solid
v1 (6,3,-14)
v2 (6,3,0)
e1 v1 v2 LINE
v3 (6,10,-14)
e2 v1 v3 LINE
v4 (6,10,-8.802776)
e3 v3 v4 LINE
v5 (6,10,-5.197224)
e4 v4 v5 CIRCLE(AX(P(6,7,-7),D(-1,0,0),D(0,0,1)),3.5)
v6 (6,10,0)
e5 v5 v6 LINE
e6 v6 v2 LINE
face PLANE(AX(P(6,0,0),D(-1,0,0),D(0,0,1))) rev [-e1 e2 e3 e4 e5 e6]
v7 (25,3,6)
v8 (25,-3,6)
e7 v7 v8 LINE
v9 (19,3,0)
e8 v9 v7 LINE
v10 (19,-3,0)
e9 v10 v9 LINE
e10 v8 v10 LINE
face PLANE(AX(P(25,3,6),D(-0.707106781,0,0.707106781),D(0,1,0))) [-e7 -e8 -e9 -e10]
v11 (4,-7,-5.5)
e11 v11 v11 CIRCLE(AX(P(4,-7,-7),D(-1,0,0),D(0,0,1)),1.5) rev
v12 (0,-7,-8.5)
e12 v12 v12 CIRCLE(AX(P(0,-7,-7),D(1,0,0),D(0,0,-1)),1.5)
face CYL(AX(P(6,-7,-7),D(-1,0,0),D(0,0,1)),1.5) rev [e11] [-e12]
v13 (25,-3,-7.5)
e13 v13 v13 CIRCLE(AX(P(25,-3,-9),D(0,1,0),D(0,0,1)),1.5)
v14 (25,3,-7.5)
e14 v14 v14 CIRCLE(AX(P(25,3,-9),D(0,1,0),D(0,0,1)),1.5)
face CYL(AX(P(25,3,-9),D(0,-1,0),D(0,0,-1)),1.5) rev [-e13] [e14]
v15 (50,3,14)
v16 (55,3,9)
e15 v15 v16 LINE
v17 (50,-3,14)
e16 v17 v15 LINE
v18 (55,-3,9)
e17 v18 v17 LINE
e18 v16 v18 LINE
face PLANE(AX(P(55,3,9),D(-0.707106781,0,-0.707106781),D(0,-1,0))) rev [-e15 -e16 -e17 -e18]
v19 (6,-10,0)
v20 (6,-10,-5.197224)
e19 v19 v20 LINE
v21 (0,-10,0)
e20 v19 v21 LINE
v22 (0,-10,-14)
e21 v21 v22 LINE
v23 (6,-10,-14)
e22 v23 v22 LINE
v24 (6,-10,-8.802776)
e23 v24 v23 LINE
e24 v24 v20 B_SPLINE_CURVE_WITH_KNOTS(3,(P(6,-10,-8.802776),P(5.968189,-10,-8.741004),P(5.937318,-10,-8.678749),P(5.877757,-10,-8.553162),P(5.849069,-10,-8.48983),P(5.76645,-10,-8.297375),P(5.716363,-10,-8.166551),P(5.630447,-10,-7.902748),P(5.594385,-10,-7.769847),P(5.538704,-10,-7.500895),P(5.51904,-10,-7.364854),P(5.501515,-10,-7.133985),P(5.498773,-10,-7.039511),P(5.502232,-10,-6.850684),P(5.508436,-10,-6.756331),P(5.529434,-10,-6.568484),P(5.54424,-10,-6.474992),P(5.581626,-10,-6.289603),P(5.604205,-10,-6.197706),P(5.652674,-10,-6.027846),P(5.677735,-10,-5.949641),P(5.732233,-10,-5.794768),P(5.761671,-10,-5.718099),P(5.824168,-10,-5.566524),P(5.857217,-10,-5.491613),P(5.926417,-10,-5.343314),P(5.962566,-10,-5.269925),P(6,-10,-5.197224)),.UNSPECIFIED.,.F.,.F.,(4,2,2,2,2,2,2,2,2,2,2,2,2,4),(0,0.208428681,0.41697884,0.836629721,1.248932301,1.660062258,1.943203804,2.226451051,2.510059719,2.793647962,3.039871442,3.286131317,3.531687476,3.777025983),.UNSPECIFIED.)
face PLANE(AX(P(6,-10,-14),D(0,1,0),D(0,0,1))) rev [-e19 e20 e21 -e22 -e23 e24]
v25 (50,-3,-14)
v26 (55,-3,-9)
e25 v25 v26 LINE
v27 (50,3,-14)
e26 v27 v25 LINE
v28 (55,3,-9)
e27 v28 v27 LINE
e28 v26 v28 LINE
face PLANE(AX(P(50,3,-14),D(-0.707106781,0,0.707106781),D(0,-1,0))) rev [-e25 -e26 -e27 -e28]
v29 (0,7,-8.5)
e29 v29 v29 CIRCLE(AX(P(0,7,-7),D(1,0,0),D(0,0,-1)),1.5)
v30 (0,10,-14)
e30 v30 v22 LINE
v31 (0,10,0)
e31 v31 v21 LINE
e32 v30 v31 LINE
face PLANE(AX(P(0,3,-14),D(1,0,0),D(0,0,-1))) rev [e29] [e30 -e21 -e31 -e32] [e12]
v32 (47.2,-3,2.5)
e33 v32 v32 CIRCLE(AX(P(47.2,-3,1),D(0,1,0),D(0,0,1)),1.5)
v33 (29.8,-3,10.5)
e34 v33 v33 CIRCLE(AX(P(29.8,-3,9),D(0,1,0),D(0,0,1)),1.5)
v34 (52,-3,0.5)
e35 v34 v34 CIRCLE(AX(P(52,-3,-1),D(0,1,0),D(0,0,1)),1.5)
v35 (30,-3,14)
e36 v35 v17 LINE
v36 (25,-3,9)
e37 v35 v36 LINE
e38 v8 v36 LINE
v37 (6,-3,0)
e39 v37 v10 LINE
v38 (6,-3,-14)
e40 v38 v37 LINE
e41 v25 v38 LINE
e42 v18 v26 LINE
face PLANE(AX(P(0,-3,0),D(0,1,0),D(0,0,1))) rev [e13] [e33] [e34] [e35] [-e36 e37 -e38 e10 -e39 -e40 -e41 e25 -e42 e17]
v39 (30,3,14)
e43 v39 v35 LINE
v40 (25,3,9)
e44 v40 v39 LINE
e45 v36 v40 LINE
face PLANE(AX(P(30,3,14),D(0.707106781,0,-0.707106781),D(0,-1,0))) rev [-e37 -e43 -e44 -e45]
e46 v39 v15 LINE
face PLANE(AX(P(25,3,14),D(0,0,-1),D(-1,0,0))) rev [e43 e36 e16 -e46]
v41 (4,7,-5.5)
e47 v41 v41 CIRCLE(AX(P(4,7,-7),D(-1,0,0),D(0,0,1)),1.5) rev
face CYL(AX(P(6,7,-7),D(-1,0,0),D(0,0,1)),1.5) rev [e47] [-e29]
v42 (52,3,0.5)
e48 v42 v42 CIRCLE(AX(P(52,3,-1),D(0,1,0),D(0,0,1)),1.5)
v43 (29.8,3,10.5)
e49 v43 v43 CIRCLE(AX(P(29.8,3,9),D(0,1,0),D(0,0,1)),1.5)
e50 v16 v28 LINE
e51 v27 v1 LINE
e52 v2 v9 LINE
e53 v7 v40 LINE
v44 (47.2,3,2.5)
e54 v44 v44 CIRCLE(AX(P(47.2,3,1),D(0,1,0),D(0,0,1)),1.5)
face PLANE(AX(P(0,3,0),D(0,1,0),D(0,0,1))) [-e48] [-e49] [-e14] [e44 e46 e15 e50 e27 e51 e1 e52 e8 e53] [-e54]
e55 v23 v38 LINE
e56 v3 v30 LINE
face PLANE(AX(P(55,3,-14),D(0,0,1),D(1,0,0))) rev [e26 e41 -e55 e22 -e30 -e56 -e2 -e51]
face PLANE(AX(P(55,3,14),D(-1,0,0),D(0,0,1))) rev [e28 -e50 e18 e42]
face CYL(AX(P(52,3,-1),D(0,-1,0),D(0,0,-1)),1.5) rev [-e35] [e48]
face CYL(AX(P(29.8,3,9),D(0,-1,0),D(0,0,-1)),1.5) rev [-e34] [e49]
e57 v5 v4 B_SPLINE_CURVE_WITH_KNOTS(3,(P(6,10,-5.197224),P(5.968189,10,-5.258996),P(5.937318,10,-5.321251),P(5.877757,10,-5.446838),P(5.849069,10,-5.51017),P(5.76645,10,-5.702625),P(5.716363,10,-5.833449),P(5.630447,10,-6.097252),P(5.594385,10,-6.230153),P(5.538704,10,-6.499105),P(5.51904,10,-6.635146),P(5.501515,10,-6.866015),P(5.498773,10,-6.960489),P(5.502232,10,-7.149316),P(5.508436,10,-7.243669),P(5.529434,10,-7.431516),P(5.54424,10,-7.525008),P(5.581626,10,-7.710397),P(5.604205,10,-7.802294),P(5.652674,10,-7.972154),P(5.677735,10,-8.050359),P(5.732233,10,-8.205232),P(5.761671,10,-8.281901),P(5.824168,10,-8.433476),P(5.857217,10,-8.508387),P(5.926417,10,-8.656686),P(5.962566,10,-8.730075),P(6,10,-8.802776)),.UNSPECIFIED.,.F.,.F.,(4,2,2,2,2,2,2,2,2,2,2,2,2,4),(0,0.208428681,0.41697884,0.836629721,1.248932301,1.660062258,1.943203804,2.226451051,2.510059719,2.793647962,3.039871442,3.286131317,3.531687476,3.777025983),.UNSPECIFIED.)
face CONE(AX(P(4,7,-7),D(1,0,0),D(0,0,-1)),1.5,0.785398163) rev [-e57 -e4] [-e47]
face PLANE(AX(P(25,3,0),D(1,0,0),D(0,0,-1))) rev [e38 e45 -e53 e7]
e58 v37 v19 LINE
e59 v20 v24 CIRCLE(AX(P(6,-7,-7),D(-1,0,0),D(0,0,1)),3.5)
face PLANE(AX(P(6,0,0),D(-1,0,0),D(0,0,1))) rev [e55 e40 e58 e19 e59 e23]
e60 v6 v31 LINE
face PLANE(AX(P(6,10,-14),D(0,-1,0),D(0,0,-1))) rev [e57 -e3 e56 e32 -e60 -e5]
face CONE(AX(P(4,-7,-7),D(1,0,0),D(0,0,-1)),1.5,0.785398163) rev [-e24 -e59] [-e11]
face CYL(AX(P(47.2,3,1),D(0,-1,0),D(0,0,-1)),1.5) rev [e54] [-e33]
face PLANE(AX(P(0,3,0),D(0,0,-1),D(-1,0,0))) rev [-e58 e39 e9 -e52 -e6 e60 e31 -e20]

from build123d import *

# Parameters (mm, degrees)
SKETCH_1_R      = 1.5
EXTRUDE_1_DEPTH = 3
SKETCH_2_W      = 14
SKETCH_2_H      = 20
SKETCH_2_R      = 1.5
EXTRUDE_2_DEPTH = 6
CHAMFER_1_SIZE  = 2
CHAMFER_2_SIZE  = 6
CHAMFER_3_SIZE  = 5


with BuildPart() as part:
    # 草图1 → 凸台-拉伸1 (new, symmetric)
    with BuildSketch(Plane(origin=(0, 0, 0), x_dir=(1, 0, 0), z_dir=(0, 1, 0))):
        Polygon((0, 14), (0, 0), (25, 0), (25, -14), (55, -14), (55, 14), align=None)
        with Locations(Location((25, 9, 0), (0, 0, 270))):
            Circle(SKETCH_1_R, mode=Mode.SUBTRACT)
        with Locations(Location((52, 1, 0), (0, 0, 270))):
            Circle(SKETCH_1_R, mode=Mode.SUBTRACT)
        with Locations(Location((29.8, -9, 0), (0, 0, 270))):
            Circle(SKETCH_1_R, mode=Mode.SUBTRACT)
        with Locations(Location((47.2, -1, 0), (0, 0, 270))):
            Circle(SKETCH_1_R, mode=Mode.SUBTRACT)
    extrude(amount=EXTRUDE_1_DEPTH, both=True)

    # 草图2 → 凸台-拉伸2 (add)
    with BuildSketch(Plane(origin=(0, 0, 0), x_dir=(0, 0, -1), z_dir=(1, 0, 0))):
        with Locations((7, 0)):
            Rectangle(SKETCH_2_W, SKETCH_2_H)
        with Locations((7, 7)):
            Circle(SKETCH_2_R, mode=Mode.SUBTRACT)
        with Locations((7, -7)):
            Circle(SKETCH_2_R, mode=Mode.SUBTRACT)
    extrude(amount=EXTRUDE_2_DEPTH)

    # 倒角1
    # the kernel refuses this chamfer: 2 mm, written as the material it takes off along each edge
    with BuildSketch(Plane(origin=(6, 7, -7), x_dir=(0, 0, -1), z_dir=(0, -1, 0))) as chamfer_1_piece_1:
        Polygon((1.5, -CHAMFER_1_SIZE), (1.5 + CHAMFER_1_SIZE, 0), (1.5, 0), align=None)
    revolve(axis=Axis((6, 7, -7), (1, 0, 0)), mode=Mode.SUBTRACT)
    with BuildSketch(Plane(origin=(6, -7, -7), x_dir=(0, 0, -1), z_dir=(0, -1, 0))) as chamfer_1_piece_2:
        Polygon((1.5 + CHAMFER_1_SIZE, 0), (1.5, -CHAMFER_1_SIZE), (1.5, 0), align=None)
    revolve(axis=Axis((6, -7, -7), (1, 0, 0)), mode=Mode.SUBTRACT)

    # 倒角2
    chamfer_2_edges = [part.edges().sort_by_distance(p)[0] for p in [
        (25, 0, 0),
    ]]
    chamfer(chamfer_2_edges, length=CHAMFER_2_SIZE)

    # 倒角3
    chamfer_3_edges = [part.edges().sort_by_distance(p)[0] for p in [
        (55, 0, -14),
        (55, 0, 14),
        (25, 0, 14),
    ]]
    chamfer(chamfer_3_edges, length=CHAMFER_3_SIZE)


solid = part.part
